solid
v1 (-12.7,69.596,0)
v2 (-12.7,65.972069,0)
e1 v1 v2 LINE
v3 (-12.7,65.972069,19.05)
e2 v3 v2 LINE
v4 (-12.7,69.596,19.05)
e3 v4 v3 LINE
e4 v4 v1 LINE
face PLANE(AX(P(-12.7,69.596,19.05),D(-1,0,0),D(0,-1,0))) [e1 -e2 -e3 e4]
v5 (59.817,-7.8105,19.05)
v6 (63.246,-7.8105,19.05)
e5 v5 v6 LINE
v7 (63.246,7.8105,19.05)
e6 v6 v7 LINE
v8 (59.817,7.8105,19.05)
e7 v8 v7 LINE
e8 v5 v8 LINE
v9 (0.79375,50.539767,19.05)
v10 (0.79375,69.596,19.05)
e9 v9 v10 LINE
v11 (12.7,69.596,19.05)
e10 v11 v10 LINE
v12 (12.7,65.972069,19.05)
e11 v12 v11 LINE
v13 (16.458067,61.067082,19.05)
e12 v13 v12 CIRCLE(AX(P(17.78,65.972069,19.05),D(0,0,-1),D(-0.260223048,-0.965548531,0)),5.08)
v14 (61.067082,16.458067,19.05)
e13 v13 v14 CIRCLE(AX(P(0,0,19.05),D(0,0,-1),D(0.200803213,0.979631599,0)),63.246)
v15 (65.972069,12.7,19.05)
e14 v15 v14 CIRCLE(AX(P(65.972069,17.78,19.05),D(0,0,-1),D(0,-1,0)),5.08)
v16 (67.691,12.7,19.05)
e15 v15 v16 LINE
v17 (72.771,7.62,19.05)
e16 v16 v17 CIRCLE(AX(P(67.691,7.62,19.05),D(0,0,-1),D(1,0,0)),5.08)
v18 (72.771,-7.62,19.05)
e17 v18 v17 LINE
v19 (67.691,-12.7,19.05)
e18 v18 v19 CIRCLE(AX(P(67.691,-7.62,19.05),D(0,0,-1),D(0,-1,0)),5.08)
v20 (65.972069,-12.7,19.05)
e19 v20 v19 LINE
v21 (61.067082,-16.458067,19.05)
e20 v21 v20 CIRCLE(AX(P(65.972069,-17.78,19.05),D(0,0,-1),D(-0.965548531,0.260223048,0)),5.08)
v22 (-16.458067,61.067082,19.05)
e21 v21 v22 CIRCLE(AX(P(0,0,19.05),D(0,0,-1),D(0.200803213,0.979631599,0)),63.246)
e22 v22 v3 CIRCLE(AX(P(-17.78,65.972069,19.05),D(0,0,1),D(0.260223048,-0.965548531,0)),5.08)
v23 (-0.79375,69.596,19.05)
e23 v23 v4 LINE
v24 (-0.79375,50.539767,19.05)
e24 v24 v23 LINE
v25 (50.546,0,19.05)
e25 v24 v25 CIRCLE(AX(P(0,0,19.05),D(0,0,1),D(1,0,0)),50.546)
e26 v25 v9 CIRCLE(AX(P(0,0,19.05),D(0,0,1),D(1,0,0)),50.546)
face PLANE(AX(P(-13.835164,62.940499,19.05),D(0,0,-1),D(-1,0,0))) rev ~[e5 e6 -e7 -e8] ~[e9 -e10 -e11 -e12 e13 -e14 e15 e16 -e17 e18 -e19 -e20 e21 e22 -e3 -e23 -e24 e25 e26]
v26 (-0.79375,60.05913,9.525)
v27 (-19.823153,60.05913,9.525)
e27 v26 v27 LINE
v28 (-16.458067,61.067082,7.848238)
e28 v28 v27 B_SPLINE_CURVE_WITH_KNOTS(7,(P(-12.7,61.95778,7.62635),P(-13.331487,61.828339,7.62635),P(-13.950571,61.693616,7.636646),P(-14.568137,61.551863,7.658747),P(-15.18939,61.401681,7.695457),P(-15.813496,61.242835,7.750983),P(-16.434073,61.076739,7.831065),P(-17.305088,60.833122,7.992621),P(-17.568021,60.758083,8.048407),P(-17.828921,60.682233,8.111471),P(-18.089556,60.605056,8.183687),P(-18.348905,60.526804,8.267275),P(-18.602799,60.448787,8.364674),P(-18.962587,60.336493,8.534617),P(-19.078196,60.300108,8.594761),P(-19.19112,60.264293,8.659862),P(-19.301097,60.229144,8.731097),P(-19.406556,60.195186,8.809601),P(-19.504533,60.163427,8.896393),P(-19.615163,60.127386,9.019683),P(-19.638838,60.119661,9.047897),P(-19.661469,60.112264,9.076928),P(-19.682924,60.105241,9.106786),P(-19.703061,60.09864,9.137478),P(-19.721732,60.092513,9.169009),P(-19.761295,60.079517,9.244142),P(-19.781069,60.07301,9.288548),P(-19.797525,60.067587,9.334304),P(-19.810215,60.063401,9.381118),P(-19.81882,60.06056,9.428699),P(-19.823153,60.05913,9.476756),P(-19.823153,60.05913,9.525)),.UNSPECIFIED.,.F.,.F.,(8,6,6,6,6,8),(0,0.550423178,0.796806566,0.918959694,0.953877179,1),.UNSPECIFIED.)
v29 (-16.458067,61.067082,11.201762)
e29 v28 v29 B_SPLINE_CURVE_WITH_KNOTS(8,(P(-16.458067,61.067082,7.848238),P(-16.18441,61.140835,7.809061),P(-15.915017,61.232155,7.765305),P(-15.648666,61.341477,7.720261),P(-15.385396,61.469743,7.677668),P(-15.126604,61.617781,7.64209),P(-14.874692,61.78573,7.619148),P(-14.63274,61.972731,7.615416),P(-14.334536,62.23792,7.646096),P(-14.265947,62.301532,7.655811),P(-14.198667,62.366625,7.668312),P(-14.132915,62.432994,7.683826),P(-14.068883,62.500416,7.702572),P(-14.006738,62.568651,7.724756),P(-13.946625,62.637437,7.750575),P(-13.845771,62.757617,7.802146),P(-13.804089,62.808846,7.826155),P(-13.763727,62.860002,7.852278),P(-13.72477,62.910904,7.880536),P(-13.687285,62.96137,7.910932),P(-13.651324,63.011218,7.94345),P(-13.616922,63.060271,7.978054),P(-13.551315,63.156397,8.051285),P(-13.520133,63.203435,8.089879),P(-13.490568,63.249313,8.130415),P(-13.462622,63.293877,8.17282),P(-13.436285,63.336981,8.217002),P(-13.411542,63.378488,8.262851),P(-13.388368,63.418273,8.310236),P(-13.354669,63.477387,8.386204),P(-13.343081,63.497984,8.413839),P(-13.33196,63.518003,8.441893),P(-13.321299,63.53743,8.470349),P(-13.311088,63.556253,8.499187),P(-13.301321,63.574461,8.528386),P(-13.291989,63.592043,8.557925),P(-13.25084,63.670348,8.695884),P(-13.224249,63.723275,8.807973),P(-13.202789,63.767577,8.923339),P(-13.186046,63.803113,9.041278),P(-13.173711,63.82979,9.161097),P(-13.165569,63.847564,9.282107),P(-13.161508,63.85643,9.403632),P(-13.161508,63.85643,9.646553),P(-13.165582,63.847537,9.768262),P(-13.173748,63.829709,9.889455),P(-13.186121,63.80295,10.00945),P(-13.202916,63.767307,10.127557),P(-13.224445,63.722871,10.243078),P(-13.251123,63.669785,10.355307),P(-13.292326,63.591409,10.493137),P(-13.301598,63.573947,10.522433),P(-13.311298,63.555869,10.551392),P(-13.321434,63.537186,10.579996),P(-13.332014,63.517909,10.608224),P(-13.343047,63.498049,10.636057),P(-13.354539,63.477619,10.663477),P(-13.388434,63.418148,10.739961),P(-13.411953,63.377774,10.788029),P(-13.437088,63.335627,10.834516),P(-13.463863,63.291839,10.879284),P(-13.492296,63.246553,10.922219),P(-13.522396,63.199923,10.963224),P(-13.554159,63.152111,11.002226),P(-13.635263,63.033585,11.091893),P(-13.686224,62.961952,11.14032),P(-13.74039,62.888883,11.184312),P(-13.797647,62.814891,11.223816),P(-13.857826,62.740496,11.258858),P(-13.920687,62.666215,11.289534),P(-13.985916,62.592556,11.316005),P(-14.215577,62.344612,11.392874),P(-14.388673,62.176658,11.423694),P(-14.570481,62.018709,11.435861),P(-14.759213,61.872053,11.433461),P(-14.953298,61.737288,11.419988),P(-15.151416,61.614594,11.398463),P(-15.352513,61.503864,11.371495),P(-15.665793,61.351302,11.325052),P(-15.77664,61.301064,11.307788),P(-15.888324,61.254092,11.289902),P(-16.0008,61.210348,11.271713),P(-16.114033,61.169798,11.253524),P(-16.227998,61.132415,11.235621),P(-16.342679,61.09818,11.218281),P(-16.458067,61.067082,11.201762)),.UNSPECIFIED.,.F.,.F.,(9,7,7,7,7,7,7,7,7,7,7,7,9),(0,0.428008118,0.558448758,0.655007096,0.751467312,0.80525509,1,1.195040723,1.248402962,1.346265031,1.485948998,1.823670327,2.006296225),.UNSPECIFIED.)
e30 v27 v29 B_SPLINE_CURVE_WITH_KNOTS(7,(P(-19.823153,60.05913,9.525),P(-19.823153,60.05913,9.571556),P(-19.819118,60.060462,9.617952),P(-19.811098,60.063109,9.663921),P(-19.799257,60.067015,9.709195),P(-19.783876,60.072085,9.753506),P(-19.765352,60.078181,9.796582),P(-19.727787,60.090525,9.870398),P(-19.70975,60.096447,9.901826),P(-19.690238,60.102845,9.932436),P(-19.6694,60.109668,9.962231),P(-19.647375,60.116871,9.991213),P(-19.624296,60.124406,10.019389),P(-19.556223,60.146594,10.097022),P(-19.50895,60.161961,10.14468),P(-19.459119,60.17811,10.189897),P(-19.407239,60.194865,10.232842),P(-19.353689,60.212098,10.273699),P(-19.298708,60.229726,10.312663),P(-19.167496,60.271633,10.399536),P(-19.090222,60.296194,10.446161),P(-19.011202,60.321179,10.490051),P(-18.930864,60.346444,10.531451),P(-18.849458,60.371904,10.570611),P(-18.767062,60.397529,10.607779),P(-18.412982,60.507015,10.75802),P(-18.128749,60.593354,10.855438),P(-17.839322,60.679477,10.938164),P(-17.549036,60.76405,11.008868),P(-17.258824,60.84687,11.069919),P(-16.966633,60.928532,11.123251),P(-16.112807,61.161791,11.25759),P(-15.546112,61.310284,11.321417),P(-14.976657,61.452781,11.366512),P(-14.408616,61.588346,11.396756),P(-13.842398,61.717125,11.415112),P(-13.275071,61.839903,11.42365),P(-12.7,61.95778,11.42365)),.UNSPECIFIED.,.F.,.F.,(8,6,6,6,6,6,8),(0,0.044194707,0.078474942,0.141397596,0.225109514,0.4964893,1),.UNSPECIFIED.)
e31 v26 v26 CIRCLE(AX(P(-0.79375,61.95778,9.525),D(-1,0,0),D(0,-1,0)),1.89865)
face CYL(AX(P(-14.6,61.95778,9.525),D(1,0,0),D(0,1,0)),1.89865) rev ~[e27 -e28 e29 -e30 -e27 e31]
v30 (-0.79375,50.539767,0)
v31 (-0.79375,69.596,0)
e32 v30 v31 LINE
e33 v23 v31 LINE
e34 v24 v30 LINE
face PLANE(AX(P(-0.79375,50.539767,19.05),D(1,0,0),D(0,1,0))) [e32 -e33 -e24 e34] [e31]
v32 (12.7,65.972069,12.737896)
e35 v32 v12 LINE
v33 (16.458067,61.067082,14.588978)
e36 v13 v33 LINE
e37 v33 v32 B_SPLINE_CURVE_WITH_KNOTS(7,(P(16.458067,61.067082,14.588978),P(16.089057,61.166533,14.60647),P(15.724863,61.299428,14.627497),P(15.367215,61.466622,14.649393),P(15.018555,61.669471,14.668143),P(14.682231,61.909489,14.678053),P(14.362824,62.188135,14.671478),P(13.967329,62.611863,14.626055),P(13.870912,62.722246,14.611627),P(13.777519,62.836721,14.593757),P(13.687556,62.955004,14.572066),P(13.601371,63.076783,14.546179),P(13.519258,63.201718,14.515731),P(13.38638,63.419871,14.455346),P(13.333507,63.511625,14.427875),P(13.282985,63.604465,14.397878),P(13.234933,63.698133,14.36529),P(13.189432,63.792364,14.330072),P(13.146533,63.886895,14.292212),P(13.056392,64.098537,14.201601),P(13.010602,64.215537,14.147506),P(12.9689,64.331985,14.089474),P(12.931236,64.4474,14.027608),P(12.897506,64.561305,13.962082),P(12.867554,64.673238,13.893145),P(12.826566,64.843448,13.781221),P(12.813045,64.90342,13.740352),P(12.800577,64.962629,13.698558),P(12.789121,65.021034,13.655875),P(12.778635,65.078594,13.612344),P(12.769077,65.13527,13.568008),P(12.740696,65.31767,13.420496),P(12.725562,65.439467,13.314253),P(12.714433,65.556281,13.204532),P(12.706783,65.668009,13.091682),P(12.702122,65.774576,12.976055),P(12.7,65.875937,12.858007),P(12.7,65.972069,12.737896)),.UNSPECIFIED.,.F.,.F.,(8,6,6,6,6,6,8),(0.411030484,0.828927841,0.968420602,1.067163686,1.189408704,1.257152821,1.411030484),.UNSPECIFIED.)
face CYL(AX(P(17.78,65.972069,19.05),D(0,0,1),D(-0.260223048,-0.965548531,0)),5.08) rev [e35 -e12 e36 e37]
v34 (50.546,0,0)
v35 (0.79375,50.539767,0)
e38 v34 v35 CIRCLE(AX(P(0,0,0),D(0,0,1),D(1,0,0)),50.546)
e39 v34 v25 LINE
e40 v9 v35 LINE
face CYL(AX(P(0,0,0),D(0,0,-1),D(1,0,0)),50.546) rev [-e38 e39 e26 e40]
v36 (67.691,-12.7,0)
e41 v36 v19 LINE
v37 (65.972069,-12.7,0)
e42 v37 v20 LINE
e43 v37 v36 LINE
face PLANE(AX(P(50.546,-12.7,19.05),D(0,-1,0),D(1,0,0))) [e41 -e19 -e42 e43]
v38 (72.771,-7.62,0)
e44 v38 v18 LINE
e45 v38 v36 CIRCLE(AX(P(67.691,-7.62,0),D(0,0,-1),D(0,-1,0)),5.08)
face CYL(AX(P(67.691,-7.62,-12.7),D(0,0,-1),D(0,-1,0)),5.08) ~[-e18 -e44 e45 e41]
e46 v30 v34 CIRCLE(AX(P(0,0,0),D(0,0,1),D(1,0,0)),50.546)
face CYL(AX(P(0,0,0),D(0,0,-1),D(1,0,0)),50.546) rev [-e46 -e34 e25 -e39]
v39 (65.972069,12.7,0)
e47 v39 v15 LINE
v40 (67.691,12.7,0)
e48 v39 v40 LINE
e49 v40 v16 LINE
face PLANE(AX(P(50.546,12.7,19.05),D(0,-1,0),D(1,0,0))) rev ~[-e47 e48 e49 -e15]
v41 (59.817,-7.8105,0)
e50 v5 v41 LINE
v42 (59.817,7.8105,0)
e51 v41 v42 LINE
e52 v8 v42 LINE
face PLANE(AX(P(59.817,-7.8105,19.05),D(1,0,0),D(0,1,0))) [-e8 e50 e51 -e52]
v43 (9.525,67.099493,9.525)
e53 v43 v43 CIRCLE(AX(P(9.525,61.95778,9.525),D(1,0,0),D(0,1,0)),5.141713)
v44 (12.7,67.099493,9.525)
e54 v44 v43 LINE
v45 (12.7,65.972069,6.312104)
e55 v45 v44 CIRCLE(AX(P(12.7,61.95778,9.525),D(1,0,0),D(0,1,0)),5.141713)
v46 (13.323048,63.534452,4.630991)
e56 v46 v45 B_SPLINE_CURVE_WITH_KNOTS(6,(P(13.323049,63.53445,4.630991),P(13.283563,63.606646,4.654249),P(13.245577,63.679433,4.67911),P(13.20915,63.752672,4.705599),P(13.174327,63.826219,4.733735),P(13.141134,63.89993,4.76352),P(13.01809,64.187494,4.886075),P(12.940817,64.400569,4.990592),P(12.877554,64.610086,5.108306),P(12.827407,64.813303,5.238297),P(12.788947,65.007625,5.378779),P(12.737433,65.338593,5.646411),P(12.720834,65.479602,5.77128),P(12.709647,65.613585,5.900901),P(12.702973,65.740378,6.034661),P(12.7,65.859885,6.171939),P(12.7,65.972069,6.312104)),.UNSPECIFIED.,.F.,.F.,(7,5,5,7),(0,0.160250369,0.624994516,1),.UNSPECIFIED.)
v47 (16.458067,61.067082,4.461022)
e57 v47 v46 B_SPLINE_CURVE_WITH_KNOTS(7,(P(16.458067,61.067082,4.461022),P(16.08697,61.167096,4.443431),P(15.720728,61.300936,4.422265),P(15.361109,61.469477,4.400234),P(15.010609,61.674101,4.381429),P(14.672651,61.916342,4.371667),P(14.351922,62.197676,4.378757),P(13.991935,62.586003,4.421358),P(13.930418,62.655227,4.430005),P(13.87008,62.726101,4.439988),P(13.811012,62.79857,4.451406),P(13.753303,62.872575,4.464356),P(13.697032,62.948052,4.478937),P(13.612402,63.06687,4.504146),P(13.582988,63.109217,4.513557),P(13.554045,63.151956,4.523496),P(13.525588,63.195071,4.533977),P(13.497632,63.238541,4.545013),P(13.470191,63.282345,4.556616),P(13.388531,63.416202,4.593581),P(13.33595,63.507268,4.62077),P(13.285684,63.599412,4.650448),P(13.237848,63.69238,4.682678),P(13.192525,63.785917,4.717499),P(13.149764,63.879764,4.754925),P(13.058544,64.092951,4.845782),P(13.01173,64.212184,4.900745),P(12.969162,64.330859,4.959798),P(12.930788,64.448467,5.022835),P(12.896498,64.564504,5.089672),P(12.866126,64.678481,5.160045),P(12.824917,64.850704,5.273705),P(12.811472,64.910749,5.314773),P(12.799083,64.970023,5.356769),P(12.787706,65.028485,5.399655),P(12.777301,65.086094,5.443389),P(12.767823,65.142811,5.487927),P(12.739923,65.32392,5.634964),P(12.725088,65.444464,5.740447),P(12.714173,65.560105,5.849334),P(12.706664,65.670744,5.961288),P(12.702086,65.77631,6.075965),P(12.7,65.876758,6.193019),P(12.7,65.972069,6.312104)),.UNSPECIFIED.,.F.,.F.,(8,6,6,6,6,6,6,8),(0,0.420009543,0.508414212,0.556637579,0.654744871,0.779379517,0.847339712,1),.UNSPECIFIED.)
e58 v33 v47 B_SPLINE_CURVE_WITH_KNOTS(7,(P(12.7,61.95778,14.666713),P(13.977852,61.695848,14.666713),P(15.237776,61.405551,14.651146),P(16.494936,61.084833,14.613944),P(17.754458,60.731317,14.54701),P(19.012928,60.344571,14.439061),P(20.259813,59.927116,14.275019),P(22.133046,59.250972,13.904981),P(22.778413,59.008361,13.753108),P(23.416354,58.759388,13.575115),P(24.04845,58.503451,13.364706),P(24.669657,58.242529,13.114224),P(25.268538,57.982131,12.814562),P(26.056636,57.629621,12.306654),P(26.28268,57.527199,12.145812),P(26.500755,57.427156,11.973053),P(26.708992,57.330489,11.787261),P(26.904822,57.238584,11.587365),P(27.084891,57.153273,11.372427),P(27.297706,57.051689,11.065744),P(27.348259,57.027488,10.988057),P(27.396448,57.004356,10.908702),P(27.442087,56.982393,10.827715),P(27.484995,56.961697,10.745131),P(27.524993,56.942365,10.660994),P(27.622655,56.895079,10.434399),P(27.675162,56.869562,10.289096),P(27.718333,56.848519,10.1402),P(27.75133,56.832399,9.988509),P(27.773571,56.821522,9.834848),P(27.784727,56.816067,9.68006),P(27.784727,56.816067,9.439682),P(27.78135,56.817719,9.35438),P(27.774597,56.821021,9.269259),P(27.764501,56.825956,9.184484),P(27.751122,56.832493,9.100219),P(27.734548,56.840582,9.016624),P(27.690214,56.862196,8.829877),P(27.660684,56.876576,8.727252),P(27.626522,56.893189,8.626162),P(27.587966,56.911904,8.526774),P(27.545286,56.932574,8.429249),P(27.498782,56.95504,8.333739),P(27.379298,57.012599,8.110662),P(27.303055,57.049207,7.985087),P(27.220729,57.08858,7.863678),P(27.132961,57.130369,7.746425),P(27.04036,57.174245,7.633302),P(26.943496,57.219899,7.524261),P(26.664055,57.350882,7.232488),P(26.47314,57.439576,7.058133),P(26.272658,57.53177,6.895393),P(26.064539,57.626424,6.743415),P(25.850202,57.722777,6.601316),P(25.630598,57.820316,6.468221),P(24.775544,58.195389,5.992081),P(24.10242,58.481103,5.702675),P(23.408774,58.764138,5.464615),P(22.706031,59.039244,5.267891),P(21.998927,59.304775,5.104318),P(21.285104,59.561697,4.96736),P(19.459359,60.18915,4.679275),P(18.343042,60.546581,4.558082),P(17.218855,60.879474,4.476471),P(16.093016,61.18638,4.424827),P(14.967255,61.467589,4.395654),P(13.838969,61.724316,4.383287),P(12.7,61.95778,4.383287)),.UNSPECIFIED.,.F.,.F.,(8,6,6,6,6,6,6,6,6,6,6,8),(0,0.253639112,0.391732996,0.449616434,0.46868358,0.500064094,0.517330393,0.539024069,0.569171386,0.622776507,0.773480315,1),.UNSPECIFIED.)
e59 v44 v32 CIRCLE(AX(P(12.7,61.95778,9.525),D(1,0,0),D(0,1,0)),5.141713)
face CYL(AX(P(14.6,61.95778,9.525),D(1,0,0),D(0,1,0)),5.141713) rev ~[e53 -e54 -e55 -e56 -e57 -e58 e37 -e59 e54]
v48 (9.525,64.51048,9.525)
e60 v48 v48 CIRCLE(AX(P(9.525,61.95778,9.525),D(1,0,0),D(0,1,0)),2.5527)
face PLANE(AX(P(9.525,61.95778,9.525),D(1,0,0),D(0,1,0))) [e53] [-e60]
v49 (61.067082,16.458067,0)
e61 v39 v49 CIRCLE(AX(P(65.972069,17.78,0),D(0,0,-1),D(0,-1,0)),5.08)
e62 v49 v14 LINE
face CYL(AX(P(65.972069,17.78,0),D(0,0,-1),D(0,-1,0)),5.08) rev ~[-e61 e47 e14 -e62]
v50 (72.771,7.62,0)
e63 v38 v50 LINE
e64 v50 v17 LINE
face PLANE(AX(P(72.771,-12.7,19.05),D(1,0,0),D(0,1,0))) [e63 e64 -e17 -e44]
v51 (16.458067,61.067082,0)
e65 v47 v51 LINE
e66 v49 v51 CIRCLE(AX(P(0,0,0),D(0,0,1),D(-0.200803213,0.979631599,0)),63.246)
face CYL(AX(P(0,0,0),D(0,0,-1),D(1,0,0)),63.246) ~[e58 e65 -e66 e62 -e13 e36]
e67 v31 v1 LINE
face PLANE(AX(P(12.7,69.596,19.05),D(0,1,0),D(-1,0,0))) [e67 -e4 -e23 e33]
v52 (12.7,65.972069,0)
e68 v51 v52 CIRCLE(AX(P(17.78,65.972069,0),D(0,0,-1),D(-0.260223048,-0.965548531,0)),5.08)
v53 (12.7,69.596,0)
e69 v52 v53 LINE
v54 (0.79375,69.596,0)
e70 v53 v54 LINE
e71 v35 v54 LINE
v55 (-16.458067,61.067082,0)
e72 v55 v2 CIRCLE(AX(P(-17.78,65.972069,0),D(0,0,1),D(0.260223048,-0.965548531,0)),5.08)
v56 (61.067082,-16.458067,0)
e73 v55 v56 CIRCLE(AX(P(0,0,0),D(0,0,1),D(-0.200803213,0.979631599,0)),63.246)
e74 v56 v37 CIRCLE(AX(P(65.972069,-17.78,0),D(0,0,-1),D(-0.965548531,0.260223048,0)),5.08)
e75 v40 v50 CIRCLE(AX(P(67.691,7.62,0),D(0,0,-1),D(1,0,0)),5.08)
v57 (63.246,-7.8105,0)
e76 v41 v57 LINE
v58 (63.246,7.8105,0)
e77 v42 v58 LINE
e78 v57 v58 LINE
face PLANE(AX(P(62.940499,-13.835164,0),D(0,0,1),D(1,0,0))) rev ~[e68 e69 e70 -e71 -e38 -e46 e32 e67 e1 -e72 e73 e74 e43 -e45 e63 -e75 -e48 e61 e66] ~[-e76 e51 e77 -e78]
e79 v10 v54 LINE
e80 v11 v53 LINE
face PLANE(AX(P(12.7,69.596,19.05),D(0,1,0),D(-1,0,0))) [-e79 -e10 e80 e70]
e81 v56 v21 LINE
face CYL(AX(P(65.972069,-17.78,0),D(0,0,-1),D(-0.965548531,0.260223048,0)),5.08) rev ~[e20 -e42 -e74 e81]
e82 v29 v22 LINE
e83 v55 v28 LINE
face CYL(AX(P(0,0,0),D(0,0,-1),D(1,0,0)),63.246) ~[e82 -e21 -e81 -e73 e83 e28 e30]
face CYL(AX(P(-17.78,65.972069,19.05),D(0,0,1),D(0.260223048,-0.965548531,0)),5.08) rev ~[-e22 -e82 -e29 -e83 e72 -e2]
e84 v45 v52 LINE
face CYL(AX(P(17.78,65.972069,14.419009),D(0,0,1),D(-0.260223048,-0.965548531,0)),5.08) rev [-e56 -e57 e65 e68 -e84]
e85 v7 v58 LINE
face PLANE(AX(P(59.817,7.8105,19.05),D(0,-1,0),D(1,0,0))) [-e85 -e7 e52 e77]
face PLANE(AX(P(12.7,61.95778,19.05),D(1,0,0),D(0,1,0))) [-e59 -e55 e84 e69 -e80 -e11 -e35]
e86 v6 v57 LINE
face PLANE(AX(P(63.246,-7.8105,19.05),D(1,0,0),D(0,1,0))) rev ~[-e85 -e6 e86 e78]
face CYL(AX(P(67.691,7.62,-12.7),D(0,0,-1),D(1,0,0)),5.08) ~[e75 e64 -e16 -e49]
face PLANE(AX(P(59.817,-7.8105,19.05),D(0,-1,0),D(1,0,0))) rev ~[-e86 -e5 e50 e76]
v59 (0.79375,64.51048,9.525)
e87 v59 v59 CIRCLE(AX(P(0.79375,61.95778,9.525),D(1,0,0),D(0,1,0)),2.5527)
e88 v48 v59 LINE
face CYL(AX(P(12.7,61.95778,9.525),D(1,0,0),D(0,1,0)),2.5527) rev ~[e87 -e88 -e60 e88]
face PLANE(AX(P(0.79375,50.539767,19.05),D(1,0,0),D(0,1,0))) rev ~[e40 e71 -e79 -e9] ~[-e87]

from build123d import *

# Parameters (mm, degrees)
F0_R          = 63.246
F0_R_2        = 50.546
F1_DEPTH      = 19.05
F3_DEPTH      = 19.05
F4_W          = 1.5875
F4_H          = 19.0562327178
F5_DEPTH      = 19.051
F6_R          = 2.5527
F7_DEPTH      = 11.90625
F8_R          = 5.1417133043
F9_DEPTH      = 3.175
F9_DEPTH_BACK = 50.547
F11_D         = 3.7973
F12_W         = 22.225
F12_H         = 25.4
F13_DEPTH     = 19.05
F14_W         = 3.429
F14_H         = 15.621
F15_DEPTH     = 19.0510001
F16_T1_DEPTH  = 19.05
F16_T6_DEPTH  = 14.4190086939
F16_S7_R      = 5.1417133043
F16_T8_DEPTH  = 9
F16_T12_DEPTH = 14.4190086939
F16_S13_R     = 5.1417133043
F16_T14_DEPTH = 9
F16_T18_DEPTH = 17.6620719982
F16_S19_R     = 1.89865
F16_T20_DEPTH = 11
F16_T24_DEPTH = 17.6620719982
F16_S25_R     = 1.89865
F16_T26_DEPTH = 11
F16_T27_DEPTH = 44.45


# Not quite as in the source:
# - a fillet or chamfer that OpenCascade refuses, or shapes differently, is made with other operations: its cross-section is extruded or revolved along the edge and cut away or added


with BuildPart() as f1:
    # F0 (on Top) → F1 (new body)
    with BuildSketch(Plane.XY):
        Circle(F0_R)
        Circle(F0_R_2, mode=Mode.SUBTRACT)
    extrude(amount=F1_DEPTH)

    # F2 (on face) → F3 (join)
    with BuildSketch(Plane.XY.offset(19.05)):
        with BuildLine():
            Line((12.7, 69.596), (-12.7, 69.596))
            Line((-12.7, 69.596), (-12.7, 61.9577801087))
            ThreePointArc((-12.7, 61.9577801087), (0, 63.246), (12.7, 61.9577801087))
            Line((12.7, 61.9577801087), (12.7, 69.596))
        make_face()
    extrude(amount=-F3_DEPTH)

    # F4 (on face) → F5 (cut, through all)
    with BuildSketch(Plane.XY.offset(19.05)):
        with Locations((0, 60.0678836411)):
            Rectangle(F4_W, F4_H)
    extrude(amount=-F5_DEPTH, mode=Mode.SUBTRACT)

    # F6 (on face) → F7 (cut, through all)
    with BuildSketch(Plane.YZ.offset(12.7)):
        with Locations((61.9577801087, 9.525)):
            Circle(F6_R)
    extrude(amount=-F7_DEPTH, mode=Mode.SUBTRACT)

    # F8 (on face) → F9 (cut, two sides)
    with BuildSketch(Plane.YZ.offset(12.7)) as f9_sk:
        with Locations((61.9577801087, 9.525)):
            Circle(F8_R)
    extrude(amount=-F9_DEPTH, mode=Mode.SUBTRACT)
    extrude(f9_sk.sketch, amount=F9_DEPTH_BACK, mode=Mode.SUBTRACT)

    # F11 (through all)
    with Locations(Plane.YZ.offset(-0.79375)):
        with Locations((61.9577801087, 9.525)):
            Hole(F11_D / 2)

    # F12 (on face) → F13 (join)
    with BuildSketch(Plane.XY.offset(19.05)):
        with Locations((61.6585, 0)):
            Rectangle(F12_W, F12_H)
    extrude(amount=-F13_DEPTH)

    # F14 (on face) → F15 (cut, through all)
    with BuildSketch(Plane.XY.offset(19.05)):
        with Locations((61.5315, 0)):
            Rectangle(F14_W, F14_H)
    extrude(amount=-F15_DEPTH, mode=Mode.SUBTRACT)

    # F16: fillet of radius 5.08 on 8 edges, made by hand

    # F16_s2 → F16_t1 (join)
    with BuildSketch(Plane.XY):
        with BuildLine():
            ThreePointArc((61.0670823721, -16.4580669145), (62.882491273, -13.7475181293), (65.972068908, -12.7))
            Line((65.972068908, -12.7), (61.9577801087, -12.7))
            ThreePointArc((61.9577801087, -12.7), (61.5411241678, -14.585833955), (61.0670823721, -16.4580669145))
        make_face()
        with BuildLine():
            ThreePointArc((65.972068908, 12.7), (62.882491273, 13.7475181293), (61.0670823721, 16.4580669145))
            ThreePointArc((61.0670823721, 16.4580669145), (61.5411241678, 14.585833955), (61.9577801087, 12.7))
            Line((61.9577801087, 12.7), (65.972068908, 12.7))
        make_face()
    extrude(amount=F16_T1_DEPTH)


with BuildPart() as f16_tool4:
    # F16_s5 → F16_t6 (new body)
    with BuildSketch(Plane.XY.offset(19.05)):
        with BuildLine():
            ThreePointArc((16.4580669145, 61.0670823721), (13.7475181293, 62.882491273), (12.7, 65.972068908))
            Line((12.7, 65.972068908), (12.7, 61.9577801087))
            ThreePointArc((12.7, 61.9577801087), (14.585833955, 61.5411241678), (16.4580669145, 61.0670823721))
        make_face()
    extrude(amount=-F16_T6_DEPTH)

    # F16_s7 → F16_t8 (cut, symmetric)
    with BuildSketch(Plane.YZ.offset(14.6)):
        with Locations((61.9577801087, 9.525)):
            Circle(F16_S7_R)
    extrude(amount=F16_T8_DEPTH, both=True, mode=Mode.SUBTRACT)


with BuildPart() as f1_1:
    add(f1.part)

    # F16_t3: union F16_tool4
    add(f16_tool4.part)


with BuildPart() as f16_tool10:
    # F16_s11 → F16_t12 (new body)
    with BuildSketch(Plane.XY.offset(14.4190086939)):
        with BuildLine():
            ThreePointArc((16.4580669145, 61.0670823721), (13.7475181293, 62.882491273), (12.7, 65.972068908))
            Line((12.7, 65.972068908), (12.7, 61.9577801087))
            ThreePointArc((12.7, 61.9577801087), (14.585833955, 61.5411241678), (16.4580669145, 61.0670823721))
        make_face()
    extrude(amount=-F16_T12_DEPTH)

    # F16_s13 → F16_t14 (cut, symmetric)
    with BuildSketch(Plane.YZ.offset(14.6)):
        with Locations((61.9577801087, 9.525)):
            Circle(F16_S13_R)
    extrude(amount=F16_T14_DEPTH, both=True, mode=Mode.SUBTRACT)


with BuildPart() as f1_2:
    add(f1_1.part)

    # F16_t9: union F16_tool10
    add(f16_tool10.part)


with BuildPart() as f16_tool16:
    # F16_s17 → F16_t18 (new body)
    with BuildSketch(Plane.XY.offset(19.05)):
        with BuildLine():
            ThreePointArc((-16.4580669145, 61.0670823721), (-13.7475181293, 62.882491273), (-12.7, 65.972068908))
            Line((-12.7, 65.972068908), (-12.7, 61.9577801087))
            ThreePointArc((-12.7, 61.9577801087), (-14.585833955, 61.5411241678), (-16.4580669145, 61.0670823721))
        make_face()
    extrude(amount=-F16_T18_DEPTH)

    # F16_s19 → F16_t20 (cut, symmetric)
    with BuildSketch(Plane.YZ.offset(-14.6)):
        with Locations((61.9577801087, 9.525)):
            Circle(F16_S19_R)
    extrude(amount=F16_T20_DEPTH, both=True, mode=Mode.SUBTRACT)


with BuildPart() as f1_3:
    add(f1_2.part)

    # F16_t15: union F16_tool16
    add(f16_tool16.part)


with BuildPart() as f16_tool22:
    # F16_s23 → F16_t24 (new body)
    with BuildSketch(Plane.XY.offset(17.6620719982)):
        with BuildLine():
            ThreePointArc((-16.4580669145, 61.0670823721), (-13.7475181293, 62.882491273), (-12.7, 65.972068908))
            Line((-12.7, 65.972068908), (-12.7, 61.9577801087))
            ThreePointArc((-12.7, 61.9577801087), (-14.585833955, 61.5411241678), (-16.4580669145, 61.0670823721))
        make_face()
    extrude(amount=-F16_T24_DEPTH)

    # F16_s25 → F16_t26 (cut, symmetric)
    with BuildSketch(Plane.YZ.offset(-14.6)):
        with Locations((61.9577801087, 9.525)):
            Circle(F16_S25_R)
    extrude(amount=F16_T26_DEPTH, both=True, mode=Mode.SUBTRACT)


with BuildPart() as f1_4:
    add(f1_3.part)

    # F16_t21: union F16_tool22
    add(f16_tool22.part)

    # F16_s28 → F16_t27 (cut)
    with BuildSketch(Plane.XY.offset(-12.7)):
        with BuildLine():
            ThreePointArc((67.691, -12.7), (71.2831024484, -11.2121024484), (72.771, -7.62))
            Line((72.771, -7.62), (72.771, -12.7))
            Line((72.771, -12.7), (67.691, -12.7))
        make_face()
        with BuildLine():
            ThreePointArc((72.771, 7.62), (71.2831024484, 11.2121024484), (67.691, 12.7))
            Line((67.691, 12.7), (72.771, 12.7))
            Line((72.771, 12.7), (72.771, 7.62))
        make_face()
    extrude(amount=F16_T27_DEPTH, mode=Mode.SUBTRACT)


solid = f1_4.part
